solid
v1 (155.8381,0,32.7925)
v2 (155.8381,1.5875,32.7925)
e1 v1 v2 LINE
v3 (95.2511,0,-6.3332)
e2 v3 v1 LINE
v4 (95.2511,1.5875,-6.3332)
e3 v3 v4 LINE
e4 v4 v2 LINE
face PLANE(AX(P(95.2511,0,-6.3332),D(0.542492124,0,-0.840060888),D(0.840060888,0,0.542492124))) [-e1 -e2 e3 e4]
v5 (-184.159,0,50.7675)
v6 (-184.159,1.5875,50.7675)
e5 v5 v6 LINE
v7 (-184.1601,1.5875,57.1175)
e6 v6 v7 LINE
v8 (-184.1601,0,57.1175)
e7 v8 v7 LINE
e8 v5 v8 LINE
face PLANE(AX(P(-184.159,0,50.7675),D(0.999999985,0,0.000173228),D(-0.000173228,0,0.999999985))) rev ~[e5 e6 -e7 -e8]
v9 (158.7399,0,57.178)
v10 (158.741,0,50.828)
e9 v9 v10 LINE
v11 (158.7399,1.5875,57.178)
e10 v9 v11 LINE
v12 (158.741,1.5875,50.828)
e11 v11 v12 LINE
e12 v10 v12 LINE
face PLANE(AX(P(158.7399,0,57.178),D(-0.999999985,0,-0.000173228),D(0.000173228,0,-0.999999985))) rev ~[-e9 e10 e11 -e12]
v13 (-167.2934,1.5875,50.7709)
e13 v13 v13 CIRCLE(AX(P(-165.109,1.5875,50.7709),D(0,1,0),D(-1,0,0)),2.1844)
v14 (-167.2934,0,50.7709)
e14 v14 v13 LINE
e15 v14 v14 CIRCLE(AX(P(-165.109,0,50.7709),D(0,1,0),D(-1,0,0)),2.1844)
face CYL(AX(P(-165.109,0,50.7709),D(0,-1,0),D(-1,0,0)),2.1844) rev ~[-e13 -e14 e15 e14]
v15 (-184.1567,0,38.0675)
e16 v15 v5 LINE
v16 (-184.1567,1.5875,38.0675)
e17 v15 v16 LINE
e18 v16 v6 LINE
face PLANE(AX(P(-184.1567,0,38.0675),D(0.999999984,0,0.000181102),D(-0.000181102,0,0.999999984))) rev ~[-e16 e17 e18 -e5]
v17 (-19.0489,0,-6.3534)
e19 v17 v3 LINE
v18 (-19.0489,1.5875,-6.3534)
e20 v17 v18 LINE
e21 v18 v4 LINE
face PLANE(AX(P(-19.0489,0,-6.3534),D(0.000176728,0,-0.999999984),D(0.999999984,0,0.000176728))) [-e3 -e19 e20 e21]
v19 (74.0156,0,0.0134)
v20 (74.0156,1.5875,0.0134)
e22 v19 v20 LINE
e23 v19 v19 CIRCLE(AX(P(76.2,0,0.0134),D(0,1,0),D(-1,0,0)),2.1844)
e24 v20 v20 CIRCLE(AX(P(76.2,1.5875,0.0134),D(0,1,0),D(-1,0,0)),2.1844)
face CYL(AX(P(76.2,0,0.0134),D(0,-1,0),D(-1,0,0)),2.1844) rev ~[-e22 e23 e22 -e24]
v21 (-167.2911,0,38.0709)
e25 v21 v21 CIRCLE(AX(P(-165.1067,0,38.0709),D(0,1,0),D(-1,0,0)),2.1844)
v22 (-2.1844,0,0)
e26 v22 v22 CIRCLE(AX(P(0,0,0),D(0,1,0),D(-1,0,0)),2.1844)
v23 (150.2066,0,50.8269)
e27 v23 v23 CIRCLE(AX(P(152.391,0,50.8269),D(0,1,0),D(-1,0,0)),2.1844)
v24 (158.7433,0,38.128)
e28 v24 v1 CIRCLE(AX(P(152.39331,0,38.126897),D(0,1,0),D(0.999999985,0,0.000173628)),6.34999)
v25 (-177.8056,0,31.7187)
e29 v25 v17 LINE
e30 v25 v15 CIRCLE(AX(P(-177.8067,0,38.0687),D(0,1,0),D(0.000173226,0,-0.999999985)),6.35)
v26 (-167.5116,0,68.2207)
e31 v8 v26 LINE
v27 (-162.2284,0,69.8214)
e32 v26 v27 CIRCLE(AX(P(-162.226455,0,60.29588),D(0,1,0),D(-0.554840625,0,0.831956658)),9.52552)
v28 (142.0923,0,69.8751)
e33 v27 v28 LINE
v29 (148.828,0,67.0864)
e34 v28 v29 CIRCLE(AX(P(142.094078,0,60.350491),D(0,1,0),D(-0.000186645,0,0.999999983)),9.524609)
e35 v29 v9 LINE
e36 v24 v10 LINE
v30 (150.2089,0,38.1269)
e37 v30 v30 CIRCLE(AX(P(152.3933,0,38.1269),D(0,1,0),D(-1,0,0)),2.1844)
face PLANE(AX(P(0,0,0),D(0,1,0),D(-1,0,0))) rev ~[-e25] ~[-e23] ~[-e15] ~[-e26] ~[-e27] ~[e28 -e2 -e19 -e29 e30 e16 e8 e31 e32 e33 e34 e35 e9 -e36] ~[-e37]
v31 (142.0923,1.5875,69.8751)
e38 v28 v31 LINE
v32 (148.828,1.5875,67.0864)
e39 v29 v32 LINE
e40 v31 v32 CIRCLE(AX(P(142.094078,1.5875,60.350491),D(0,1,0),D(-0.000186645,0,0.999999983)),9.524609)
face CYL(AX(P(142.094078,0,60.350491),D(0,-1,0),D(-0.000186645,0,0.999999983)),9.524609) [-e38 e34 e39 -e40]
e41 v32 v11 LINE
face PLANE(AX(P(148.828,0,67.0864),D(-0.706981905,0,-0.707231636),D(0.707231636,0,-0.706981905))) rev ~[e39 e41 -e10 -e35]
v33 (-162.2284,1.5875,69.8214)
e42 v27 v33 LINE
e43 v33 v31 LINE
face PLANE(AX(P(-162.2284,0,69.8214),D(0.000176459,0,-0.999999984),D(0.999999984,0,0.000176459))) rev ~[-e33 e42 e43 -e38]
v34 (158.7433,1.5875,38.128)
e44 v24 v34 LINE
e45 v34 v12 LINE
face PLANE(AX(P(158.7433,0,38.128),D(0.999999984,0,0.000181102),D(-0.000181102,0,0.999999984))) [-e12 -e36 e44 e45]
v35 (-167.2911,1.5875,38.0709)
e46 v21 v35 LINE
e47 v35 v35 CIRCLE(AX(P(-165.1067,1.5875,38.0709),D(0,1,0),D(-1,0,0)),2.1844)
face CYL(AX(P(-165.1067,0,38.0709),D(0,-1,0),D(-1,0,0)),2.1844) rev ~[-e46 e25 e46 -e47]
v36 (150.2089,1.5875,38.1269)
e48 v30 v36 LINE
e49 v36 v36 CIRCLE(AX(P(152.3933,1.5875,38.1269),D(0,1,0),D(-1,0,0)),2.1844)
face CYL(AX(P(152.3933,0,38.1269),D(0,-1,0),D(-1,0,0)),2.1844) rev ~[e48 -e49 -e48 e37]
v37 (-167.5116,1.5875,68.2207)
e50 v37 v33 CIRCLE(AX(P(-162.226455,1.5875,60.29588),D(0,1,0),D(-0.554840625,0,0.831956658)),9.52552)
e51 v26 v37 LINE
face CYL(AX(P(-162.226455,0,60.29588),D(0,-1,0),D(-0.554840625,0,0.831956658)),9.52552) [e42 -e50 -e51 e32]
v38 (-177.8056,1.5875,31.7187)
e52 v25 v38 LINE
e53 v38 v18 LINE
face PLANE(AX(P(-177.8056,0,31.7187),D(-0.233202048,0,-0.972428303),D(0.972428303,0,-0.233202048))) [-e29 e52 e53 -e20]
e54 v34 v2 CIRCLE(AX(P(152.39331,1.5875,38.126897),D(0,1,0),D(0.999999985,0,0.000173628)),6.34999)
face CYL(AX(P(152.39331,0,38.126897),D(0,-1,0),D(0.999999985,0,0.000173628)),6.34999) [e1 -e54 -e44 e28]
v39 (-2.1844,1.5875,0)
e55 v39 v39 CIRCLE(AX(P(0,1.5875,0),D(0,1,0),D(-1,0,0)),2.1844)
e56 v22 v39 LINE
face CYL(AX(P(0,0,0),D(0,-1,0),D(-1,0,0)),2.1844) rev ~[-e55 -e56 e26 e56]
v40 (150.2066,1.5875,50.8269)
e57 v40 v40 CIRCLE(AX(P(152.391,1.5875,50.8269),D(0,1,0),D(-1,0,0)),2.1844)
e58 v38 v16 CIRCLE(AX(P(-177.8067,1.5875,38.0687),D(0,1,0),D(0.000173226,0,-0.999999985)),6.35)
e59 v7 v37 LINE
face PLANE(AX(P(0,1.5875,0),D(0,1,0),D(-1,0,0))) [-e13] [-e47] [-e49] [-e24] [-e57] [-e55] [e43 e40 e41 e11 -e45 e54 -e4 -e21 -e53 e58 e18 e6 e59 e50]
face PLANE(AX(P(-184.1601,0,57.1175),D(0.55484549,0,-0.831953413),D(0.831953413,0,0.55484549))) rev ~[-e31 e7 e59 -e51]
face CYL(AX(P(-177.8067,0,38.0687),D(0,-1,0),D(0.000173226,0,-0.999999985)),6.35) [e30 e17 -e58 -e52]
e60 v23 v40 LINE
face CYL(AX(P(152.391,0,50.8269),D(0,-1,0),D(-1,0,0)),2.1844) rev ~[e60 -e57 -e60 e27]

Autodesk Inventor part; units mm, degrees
ref_plane "YZ Plane" through (0, 0, 0) normal (1, 0, 0) x (0, 1, 0)
ref_plane "XZ Plane" through (0, 0, 0) normal (0, 1, 0) x (-1, 0, 0)
ref_plane "XY Plane" through (0, 0, 0) normal (0, 0, 1) x (1, 0, 0)
sketch "main" plane through (0, 0, 0) normal (0, 0, 1) x (1, 0, 0)
  circle A0 centre (45.9011, -170.4057) radius 2.1844
  circle A1 centre (58.6011, -170.4057) radius 2.1844
  arc A2 (39.5511, -183.1057) -> (45.9011, -189.4557) centre (45.9011, -183.1057) ccw
  line L0 (45.9011, -189.4557) -> (58.6011, -189.4557)
  line L1 (39.5511, -183.1057) -> (1.4511, -24.3557)
  arc A3 (76.0514, -172.8053) -> (77.6511, -167.5218) centre (68.1261, -167.5218) ccw
  line L2 (64.9511, -189.4557) -> (76.0514, -172.8053)
  line L3 (58.6011, -189.4557) -> (64.9511, -189.4557)
  circle A4 centre (45.9011, 147.0943) radius 2.1844
  circle A5 centre (58.6011, 147.0943) radius 2.1844
  circle A6 centre (7.8011, -5.3057) radius 2.1844
  circle A7 centre (7.8011, 70.8943) radius 2.1844
  line L4 (77.6511, -167.5218) -> (77.6511, 136.7989)
  line L5 (1.4511, -24.3557) -> (1.4511, 89.9443)
  arc A8 (77.6511, 136.7989) -> (74.8613, 143.5341) centre (68.1261, 136.7989) ccw
  line L6 (74.8613, 143.5341) -> (64.9511, 153.4443)
  line L7 (64.9511, 153.4443) -> (58.6011, 153.4443)
  line L8 (45.9011, 153.4443) -> (58.6011, 153.4443)
  arc A9 (45.9011, 153.4443) -> (40.5661, 150.5382) centre (45.9011, 147.0943) ccw
  line L9 (1.4511, 89.9443) -> (40.5661, 150.5382)
  point P0 (53.0582, -9.4982)
  point P1 (77.6511, -170.4057)
  point P2 (77.6511, -189.4557)
  point P3 (77.6511, 140.7443)
  point P4 (77.6511, 153.4443)
  dimension "d0" = 19.05
  dimension "d1" = 12.7
  dimension "d2" = 19.05
  dimension "d3" = 12.7
  dimension "d4" = 12.7
  dimension "d5" = 19.05
  dimension "d6" = 9.525
sketch "Sketch1" plane through (0, 0, 0) normal (0, 1, 0) x (-1, 0, 0)
  circle A0 centre (165.1067, 38.0709) radius 2.1844
  circle A1 centre (165.109, 50.7709) radius 2.1844
  arc A2 (177.8056, 31.7187) -> (184.1567, 38.0675) centre (177.8067, 38.0687) ccw
  line L0 (184.1567, 38.0675) -> (184.159, 50.7675)
  line L1 (177.8056, 31.7187) -> (19.0489, -6.3534)
  arc A3 (167.5116, 68.2207) -> (162.2284, 69.8214) centre (162.2267, 60.2964) ccw
  line L2 (184.1601, 57.1175) -> (167.5116, 68.2207)
  line L3 (184.159, 50.7675) -> (184.1601, 57.1175)
  circle A4 centre (-152.3933, 38.1269) radius 2.1844
  circle A5 centre (-152.391, 50.8269) radius 2.1844
  circle A6 centre (0, 0) radius 2.1844
  circle A7 centre (-76.2, 0.0134) radius 2.1844
  line L4 (162.2284, 69.8214) -> (-142.0923, 69.8751)
  line L5 (19.0489, -6.3534) -> (-95.2511, -6.3332)
  arc A8 (-142.0923, 69.8751) -> (-148.828, 67.0864) centre (-142.094, 60.3501) ccw
  line L6 (-148.828, 67.0864) -> (-158.7399, 57.178)
  line L7 (-158.7399, 57.178) -> (-158.741, 50.828)
  line L8 (-158.7433, 38.128) -> (-158.741, 50.828)
  arc A9 (-158.7433, 38.128) -> (-155.8381, 32.7925) centre (-152.3933, 38.1269) ccw
  line L9 (-95.2511, -6.3332) -> (-155.8381, 32.7925)
  point P0 (0, 0)
extrude "Extrusion1" add sketch "Sketch1" along normal blind 1.5875
equation "\"d4\" = d3"
properties part number "skirt" material "Acetal Resin, White"
